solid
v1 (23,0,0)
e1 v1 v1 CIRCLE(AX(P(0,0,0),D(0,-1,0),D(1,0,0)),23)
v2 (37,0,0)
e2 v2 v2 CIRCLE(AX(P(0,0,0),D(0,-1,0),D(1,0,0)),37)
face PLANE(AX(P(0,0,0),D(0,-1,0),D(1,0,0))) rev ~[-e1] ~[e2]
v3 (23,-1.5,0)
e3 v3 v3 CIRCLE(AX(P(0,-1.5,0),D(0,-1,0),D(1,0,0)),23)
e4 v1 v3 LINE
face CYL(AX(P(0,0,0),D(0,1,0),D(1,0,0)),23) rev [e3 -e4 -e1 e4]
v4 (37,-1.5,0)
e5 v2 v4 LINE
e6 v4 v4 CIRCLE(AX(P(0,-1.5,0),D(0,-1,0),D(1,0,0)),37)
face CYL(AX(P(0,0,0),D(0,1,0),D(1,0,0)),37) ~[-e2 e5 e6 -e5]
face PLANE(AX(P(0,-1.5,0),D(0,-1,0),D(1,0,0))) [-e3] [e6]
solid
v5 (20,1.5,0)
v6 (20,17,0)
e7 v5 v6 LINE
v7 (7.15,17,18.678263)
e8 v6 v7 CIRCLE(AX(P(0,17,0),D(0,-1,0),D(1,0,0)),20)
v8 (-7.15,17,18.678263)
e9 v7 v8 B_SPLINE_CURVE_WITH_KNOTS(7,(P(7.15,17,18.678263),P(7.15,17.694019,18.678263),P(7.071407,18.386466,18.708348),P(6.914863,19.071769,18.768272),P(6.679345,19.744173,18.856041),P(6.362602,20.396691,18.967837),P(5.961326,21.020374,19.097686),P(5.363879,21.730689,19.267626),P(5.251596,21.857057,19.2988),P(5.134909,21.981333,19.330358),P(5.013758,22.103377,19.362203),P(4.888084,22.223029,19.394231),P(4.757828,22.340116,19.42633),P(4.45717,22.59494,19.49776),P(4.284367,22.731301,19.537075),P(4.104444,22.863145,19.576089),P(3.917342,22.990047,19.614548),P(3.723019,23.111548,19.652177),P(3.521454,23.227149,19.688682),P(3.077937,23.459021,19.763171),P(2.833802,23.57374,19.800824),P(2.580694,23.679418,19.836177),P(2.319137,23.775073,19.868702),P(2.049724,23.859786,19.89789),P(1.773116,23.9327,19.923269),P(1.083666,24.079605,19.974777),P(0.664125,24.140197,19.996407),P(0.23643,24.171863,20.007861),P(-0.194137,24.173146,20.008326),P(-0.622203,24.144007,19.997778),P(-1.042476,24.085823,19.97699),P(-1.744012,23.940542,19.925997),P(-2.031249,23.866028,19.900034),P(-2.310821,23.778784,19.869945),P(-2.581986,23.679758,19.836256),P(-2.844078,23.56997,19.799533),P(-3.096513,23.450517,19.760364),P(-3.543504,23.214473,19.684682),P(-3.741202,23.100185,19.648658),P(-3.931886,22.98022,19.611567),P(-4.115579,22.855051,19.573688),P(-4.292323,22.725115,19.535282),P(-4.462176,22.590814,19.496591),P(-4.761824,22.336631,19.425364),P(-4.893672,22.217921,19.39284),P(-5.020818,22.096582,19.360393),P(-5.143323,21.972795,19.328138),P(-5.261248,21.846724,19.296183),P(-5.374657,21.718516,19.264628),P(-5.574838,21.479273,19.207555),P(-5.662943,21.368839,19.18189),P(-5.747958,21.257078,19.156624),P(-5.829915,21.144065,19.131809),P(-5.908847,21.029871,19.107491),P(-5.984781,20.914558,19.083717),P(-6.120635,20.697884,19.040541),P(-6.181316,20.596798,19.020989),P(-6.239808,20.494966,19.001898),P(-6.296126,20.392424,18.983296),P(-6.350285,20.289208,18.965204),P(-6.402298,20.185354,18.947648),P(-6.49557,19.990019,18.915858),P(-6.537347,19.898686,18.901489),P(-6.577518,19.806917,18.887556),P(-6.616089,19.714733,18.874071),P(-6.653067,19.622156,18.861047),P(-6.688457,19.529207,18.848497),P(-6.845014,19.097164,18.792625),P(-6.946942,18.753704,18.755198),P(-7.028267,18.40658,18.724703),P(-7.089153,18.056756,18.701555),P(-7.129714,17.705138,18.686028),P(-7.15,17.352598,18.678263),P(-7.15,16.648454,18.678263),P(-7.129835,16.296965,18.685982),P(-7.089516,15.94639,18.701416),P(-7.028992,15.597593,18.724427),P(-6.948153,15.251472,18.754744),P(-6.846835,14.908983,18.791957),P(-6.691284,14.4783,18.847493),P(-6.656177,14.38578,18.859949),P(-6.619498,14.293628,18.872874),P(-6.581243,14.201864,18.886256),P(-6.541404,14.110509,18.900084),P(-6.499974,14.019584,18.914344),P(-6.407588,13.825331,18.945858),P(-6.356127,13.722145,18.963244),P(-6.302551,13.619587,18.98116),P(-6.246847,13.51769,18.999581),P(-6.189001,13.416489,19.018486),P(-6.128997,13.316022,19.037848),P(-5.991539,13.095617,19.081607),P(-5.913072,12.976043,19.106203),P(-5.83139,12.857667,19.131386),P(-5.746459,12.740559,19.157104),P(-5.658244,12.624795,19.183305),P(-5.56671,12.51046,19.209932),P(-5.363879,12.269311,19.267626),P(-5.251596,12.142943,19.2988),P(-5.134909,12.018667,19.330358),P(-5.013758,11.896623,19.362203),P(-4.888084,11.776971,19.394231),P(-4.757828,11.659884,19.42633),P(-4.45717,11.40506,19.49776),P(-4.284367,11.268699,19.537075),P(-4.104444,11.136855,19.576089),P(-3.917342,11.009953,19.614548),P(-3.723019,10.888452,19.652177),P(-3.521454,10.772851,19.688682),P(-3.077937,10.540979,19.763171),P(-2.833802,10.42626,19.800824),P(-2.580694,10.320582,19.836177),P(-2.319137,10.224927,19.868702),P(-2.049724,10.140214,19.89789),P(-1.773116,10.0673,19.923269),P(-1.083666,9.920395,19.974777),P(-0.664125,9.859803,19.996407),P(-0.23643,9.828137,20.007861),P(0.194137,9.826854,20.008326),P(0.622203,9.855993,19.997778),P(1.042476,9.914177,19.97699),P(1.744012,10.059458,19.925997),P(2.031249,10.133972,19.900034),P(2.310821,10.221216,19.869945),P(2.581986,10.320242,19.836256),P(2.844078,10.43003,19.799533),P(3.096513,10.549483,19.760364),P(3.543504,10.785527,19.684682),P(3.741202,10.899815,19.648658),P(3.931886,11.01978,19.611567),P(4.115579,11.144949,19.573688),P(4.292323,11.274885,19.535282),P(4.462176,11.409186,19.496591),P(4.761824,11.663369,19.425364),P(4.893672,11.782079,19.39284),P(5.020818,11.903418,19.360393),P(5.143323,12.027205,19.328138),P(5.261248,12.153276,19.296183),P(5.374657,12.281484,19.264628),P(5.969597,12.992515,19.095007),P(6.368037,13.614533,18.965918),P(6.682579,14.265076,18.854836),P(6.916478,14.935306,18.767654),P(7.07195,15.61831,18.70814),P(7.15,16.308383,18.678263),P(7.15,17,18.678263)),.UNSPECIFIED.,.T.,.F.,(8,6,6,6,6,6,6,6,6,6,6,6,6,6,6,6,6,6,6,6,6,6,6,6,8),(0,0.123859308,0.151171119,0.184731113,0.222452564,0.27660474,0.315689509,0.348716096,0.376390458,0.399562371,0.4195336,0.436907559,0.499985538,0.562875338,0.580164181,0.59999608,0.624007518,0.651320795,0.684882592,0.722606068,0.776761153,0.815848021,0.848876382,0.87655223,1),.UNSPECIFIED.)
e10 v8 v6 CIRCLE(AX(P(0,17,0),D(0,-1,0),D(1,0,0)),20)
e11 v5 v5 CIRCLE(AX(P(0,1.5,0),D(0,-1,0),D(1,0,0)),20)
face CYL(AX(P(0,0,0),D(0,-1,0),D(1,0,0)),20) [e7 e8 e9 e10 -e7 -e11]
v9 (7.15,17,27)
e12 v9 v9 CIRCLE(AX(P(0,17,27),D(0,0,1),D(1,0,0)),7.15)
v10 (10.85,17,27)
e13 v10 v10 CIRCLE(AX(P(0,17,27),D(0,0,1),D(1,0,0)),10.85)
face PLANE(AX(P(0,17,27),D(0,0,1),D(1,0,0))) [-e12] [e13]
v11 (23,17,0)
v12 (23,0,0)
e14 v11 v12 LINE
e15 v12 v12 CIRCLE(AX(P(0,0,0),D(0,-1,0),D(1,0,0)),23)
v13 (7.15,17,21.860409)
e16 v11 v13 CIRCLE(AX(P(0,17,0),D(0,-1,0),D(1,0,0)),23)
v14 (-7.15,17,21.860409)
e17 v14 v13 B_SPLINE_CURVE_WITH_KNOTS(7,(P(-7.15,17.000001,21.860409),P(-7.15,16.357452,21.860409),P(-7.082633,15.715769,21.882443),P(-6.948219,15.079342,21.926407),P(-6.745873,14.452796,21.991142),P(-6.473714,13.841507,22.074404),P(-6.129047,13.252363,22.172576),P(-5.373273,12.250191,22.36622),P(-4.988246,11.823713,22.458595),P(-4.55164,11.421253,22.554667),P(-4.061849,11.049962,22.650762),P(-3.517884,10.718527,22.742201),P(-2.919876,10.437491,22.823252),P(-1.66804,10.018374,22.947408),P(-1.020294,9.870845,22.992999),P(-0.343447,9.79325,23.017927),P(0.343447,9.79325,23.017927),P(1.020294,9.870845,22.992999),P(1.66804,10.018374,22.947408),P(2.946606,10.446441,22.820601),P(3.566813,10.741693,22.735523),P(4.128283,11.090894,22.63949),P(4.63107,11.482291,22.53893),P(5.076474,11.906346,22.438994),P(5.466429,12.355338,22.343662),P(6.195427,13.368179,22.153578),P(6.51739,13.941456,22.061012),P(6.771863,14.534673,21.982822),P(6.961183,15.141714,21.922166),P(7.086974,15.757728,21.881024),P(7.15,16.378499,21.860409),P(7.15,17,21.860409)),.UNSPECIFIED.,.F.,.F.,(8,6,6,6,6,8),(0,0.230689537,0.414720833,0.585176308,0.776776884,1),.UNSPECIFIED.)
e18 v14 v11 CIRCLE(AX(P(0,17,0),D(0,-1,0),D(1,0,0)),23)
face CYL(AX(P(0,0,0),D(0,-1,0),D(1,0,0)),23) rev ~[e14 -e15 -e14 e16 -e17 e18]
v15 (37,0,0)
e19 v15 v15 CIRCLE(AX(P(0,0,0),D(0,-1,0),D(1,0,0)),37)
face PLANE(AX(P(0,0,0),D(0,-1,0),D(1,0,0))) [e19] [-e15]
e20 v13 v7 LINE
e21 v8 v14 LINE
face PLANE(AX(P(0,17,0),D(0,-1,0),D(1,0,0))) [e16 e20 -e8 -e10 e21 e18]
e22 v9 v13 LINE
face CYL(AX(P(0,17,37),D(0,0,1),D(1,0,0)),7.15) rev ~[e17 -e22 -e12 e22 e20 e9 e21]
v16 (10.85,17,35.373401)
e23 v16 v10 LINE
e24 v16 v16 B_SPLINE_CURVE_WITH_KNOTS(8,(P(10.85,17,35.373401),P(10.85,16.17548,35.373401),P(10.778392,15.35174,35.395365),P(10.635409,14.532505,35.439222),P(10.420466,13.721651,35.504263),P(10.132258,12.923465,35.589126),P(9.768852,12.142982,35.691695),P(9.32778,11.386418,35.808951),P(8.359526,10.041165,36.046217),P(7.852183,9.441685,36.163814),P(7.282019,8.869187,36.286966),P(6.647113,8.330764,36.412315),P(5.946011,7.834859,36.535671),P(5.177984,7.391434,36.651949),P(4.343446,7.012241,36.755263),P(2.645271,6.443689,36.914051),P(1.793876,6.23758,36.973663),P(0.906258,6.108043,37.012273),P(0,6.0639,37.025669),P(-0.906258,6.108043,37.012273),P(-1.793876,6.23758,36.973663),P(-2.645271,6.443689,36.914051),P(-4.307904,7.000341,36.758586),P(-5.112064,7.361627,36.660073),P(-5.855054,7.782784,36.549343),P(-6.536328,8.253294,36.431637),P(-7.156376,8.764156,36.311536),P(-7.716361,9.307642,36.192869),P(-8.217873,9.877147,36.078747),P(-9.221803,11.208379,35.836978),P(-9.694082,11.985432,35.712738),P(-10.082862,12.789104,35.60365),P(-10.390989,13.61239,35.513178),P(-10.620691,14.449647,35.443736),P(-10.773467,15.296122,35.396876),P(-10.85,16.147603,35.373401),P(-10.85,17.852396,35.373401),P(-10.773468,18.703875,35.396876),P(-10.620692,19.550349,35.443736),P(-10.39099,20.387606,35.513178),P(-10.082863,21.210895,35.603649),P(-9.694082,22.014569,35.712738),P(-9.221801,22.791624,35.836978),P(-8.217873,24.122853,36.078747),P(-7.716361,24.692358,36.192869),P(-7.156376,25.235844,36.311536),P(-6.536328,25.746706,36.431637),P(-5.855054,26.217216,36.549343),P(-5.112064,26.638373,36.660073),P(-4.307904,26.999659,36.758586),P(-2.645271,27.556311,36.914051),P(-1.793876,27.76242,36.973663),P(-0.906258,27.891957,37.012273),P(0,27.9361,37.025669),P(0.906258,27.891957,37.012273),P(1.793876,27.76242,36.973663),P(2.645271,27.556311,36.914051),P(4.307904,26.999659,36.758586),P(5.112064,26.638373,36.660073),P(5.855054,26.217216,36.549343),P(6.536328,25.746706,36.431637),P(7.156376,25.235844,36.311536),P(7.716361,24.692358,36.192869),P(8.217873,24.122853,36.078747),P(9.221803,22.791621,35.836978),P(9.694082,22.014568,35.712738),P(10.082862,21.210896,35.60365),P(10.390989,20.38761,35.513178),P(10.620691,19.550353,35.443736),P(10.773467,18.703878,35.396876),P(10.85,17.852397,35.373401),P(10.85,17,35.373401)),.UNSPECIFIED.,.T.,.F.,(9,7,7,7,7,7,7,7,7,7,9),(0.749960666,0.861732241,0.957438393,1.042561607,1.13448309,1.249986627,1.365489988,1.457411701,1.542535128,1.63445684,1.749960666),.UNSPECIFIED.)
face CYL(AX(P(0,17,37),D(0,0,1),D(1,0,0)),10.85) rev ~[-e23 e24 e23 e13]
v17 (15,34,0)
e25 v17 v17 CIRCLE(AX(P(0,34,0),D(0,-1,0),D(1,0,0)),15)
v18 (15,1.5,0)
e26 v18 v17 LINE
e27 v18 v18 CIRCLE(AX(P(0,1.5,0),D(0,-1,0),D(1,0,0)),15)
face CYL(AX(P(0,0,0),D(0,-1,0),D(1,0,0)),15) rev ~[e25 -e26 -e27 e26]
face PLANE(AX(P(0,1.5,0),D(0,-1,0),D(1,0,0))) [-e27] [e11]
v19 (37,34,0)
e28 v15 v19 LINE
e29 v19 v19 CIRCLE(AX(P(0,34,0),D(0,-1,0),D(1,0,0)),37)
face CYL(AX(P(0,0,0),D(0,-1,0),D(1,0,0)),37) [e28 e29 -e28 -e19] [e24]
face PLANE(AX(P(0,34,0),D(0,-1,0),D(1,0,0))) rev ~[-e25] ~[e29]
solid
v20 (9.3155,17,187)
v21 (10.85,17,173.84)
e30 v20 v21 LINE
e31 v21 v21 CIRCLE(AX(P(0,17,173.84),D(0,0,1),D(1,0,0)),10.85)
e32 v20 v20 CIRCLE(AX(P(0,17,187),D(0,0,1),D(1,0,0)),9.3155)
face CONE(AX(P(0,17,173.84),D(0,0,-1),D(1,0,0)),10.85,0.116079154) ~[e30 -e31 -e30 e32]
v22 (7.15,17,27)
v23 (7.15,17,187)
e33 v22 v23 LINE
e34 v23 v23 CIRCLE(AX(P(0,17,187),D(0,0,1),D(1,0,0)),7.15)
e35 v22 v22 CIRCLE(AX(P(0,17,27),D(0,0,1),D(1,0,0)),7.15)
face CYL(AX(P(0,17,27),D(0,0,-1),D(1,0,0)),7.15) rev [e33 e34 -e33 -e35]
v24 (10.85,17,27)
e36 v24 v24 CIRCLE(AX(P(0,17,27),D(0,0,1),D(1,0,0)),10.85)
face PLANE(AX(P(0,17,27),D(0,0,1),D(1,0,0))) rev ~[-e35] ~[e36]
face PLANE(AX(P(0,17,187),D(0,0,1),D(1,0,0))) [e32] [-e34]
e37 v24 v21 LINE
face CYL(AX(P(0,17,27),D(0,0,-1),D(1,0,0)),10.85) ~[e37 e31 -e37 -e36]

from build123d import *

# Parameters (mm, degrees)
F0_R          = 37
F0_R_2        = 15
F1_DEPTH      = 34
F2_R          = 23
F2_R_2        = 15
F3_DEPTH      = 1.5
F4_R          = 23
F4_R_2        = 20
F5_DEPTH      = 17
F8_END_RADIUS = 20
F7_R          = 7.15
F8_REACH      = 94.2242539419
F9_R          = 10.85
F10_DEPTH     = 10
F11_R         = 10.85
F11_R_2       = 7.15
F12_DEPTH     = 160
F13_SIZE2     = 13.16
F13_SIZE      = 1.5345
F14_R         = 37
F14_R_2       = 23
F15_DEPTH     = 1.5


with BuildPart() as f1:
    # F0 (on Front) → F1 (new body)
    with BuildSketch(Plane.XZ):
        Circle(F0_R)
        Circle(F0_R_2, mode=Mode.SUBTRACT)
    extrude(amount=-F1_DEPTH)

    # F2 (on face) → F3 (cut)
    with BuildSketch(Plane.XZ):
        Circle(F2_R)
        Circle(F2_R_2, mode=Mode.SUBTRACT)
    extrude(amount=-F3_DEPTH, mode=Mode.SUBTRACT)

    # F4 (on face) → F5 (cut)
    with BuildSketch(Plane.XZ):
        Circle(F4_R)
        Circle(F4_R_2, mode=Mode.SUBTRACT)
    extrude(amount=-F5_DEPTH, mode=Mode.SUBTRACT)

    f8_end = (Plane(origin=(0, 9.25, 0), x_dir=(0, 0, -1), z_dir=(0, -1, 0)) * Cylinder(F8_END_RADIUS, 408.5212231395, mode=Mode.PRIVATE)).faces().sort_by_distance((-20, 9.25, 0))[0]
    # F7 (on offset) → F8 (cut, up to the whole of a round face its end follows)
    with BuildSketch(Plane.XY.offset(37)):
        with Locations((0, 17)):
            Circle(F7_R)
    f8_long = extrude(amount=-F8_REACH, mode=Mode.PRIVATE)
    add(split(f8_long, bisect_by=f8_end, keep=Keep.ALL, mode=Mode.PRIVATE).solids().sort_by_distance((0, 17, 37))[0], mode=Mode.SUBTRACT)

    # F9 (on offset) → F10 (cut)
    with BuildSketch(Plane.XY.offset(37)):
        with Locations((0, 17)):
            Circle(F9_R)
    extrude(amount=-F10_DEPTH, mode=Mode.SUBTRACT)


with BuildPart() as f12:
    # F11 (on face) → F12 (new body)
    with BuildSketch(Plane.XY.offset(27)):
        with Locations((0, 17)):
            Circle(F11_R)
        with Locations((0, 17)):
            Circle(F11_R_2, mode=Mode.SUBTRACT)
    extrude(amount=F12_DEPTH)

    # F13
    f13_edges = [f12.edges().sort_by_distance(p)[0] for p in [
        (-10.85, 17, 187),
    ]]
    f13_side = f12.faces().sort_by_distance((-10.543116, 17, 187))[0]
    chamfer(f13_edges, length=F13_SIZE, length2=F13_SIZE2, reference=f13_side)


with BuildPart() as f15:
    # F14 (on face) → F15 (new body)
    with BuildSketch(Plane.XZ):
        Circle(F14_R)
        Circle(F14_R_2, mode=Mode.SUBTRACT)
    extrude(amount=F15_DEPTH)


solid = Compound([f1.part, f12.part, f15.part])
